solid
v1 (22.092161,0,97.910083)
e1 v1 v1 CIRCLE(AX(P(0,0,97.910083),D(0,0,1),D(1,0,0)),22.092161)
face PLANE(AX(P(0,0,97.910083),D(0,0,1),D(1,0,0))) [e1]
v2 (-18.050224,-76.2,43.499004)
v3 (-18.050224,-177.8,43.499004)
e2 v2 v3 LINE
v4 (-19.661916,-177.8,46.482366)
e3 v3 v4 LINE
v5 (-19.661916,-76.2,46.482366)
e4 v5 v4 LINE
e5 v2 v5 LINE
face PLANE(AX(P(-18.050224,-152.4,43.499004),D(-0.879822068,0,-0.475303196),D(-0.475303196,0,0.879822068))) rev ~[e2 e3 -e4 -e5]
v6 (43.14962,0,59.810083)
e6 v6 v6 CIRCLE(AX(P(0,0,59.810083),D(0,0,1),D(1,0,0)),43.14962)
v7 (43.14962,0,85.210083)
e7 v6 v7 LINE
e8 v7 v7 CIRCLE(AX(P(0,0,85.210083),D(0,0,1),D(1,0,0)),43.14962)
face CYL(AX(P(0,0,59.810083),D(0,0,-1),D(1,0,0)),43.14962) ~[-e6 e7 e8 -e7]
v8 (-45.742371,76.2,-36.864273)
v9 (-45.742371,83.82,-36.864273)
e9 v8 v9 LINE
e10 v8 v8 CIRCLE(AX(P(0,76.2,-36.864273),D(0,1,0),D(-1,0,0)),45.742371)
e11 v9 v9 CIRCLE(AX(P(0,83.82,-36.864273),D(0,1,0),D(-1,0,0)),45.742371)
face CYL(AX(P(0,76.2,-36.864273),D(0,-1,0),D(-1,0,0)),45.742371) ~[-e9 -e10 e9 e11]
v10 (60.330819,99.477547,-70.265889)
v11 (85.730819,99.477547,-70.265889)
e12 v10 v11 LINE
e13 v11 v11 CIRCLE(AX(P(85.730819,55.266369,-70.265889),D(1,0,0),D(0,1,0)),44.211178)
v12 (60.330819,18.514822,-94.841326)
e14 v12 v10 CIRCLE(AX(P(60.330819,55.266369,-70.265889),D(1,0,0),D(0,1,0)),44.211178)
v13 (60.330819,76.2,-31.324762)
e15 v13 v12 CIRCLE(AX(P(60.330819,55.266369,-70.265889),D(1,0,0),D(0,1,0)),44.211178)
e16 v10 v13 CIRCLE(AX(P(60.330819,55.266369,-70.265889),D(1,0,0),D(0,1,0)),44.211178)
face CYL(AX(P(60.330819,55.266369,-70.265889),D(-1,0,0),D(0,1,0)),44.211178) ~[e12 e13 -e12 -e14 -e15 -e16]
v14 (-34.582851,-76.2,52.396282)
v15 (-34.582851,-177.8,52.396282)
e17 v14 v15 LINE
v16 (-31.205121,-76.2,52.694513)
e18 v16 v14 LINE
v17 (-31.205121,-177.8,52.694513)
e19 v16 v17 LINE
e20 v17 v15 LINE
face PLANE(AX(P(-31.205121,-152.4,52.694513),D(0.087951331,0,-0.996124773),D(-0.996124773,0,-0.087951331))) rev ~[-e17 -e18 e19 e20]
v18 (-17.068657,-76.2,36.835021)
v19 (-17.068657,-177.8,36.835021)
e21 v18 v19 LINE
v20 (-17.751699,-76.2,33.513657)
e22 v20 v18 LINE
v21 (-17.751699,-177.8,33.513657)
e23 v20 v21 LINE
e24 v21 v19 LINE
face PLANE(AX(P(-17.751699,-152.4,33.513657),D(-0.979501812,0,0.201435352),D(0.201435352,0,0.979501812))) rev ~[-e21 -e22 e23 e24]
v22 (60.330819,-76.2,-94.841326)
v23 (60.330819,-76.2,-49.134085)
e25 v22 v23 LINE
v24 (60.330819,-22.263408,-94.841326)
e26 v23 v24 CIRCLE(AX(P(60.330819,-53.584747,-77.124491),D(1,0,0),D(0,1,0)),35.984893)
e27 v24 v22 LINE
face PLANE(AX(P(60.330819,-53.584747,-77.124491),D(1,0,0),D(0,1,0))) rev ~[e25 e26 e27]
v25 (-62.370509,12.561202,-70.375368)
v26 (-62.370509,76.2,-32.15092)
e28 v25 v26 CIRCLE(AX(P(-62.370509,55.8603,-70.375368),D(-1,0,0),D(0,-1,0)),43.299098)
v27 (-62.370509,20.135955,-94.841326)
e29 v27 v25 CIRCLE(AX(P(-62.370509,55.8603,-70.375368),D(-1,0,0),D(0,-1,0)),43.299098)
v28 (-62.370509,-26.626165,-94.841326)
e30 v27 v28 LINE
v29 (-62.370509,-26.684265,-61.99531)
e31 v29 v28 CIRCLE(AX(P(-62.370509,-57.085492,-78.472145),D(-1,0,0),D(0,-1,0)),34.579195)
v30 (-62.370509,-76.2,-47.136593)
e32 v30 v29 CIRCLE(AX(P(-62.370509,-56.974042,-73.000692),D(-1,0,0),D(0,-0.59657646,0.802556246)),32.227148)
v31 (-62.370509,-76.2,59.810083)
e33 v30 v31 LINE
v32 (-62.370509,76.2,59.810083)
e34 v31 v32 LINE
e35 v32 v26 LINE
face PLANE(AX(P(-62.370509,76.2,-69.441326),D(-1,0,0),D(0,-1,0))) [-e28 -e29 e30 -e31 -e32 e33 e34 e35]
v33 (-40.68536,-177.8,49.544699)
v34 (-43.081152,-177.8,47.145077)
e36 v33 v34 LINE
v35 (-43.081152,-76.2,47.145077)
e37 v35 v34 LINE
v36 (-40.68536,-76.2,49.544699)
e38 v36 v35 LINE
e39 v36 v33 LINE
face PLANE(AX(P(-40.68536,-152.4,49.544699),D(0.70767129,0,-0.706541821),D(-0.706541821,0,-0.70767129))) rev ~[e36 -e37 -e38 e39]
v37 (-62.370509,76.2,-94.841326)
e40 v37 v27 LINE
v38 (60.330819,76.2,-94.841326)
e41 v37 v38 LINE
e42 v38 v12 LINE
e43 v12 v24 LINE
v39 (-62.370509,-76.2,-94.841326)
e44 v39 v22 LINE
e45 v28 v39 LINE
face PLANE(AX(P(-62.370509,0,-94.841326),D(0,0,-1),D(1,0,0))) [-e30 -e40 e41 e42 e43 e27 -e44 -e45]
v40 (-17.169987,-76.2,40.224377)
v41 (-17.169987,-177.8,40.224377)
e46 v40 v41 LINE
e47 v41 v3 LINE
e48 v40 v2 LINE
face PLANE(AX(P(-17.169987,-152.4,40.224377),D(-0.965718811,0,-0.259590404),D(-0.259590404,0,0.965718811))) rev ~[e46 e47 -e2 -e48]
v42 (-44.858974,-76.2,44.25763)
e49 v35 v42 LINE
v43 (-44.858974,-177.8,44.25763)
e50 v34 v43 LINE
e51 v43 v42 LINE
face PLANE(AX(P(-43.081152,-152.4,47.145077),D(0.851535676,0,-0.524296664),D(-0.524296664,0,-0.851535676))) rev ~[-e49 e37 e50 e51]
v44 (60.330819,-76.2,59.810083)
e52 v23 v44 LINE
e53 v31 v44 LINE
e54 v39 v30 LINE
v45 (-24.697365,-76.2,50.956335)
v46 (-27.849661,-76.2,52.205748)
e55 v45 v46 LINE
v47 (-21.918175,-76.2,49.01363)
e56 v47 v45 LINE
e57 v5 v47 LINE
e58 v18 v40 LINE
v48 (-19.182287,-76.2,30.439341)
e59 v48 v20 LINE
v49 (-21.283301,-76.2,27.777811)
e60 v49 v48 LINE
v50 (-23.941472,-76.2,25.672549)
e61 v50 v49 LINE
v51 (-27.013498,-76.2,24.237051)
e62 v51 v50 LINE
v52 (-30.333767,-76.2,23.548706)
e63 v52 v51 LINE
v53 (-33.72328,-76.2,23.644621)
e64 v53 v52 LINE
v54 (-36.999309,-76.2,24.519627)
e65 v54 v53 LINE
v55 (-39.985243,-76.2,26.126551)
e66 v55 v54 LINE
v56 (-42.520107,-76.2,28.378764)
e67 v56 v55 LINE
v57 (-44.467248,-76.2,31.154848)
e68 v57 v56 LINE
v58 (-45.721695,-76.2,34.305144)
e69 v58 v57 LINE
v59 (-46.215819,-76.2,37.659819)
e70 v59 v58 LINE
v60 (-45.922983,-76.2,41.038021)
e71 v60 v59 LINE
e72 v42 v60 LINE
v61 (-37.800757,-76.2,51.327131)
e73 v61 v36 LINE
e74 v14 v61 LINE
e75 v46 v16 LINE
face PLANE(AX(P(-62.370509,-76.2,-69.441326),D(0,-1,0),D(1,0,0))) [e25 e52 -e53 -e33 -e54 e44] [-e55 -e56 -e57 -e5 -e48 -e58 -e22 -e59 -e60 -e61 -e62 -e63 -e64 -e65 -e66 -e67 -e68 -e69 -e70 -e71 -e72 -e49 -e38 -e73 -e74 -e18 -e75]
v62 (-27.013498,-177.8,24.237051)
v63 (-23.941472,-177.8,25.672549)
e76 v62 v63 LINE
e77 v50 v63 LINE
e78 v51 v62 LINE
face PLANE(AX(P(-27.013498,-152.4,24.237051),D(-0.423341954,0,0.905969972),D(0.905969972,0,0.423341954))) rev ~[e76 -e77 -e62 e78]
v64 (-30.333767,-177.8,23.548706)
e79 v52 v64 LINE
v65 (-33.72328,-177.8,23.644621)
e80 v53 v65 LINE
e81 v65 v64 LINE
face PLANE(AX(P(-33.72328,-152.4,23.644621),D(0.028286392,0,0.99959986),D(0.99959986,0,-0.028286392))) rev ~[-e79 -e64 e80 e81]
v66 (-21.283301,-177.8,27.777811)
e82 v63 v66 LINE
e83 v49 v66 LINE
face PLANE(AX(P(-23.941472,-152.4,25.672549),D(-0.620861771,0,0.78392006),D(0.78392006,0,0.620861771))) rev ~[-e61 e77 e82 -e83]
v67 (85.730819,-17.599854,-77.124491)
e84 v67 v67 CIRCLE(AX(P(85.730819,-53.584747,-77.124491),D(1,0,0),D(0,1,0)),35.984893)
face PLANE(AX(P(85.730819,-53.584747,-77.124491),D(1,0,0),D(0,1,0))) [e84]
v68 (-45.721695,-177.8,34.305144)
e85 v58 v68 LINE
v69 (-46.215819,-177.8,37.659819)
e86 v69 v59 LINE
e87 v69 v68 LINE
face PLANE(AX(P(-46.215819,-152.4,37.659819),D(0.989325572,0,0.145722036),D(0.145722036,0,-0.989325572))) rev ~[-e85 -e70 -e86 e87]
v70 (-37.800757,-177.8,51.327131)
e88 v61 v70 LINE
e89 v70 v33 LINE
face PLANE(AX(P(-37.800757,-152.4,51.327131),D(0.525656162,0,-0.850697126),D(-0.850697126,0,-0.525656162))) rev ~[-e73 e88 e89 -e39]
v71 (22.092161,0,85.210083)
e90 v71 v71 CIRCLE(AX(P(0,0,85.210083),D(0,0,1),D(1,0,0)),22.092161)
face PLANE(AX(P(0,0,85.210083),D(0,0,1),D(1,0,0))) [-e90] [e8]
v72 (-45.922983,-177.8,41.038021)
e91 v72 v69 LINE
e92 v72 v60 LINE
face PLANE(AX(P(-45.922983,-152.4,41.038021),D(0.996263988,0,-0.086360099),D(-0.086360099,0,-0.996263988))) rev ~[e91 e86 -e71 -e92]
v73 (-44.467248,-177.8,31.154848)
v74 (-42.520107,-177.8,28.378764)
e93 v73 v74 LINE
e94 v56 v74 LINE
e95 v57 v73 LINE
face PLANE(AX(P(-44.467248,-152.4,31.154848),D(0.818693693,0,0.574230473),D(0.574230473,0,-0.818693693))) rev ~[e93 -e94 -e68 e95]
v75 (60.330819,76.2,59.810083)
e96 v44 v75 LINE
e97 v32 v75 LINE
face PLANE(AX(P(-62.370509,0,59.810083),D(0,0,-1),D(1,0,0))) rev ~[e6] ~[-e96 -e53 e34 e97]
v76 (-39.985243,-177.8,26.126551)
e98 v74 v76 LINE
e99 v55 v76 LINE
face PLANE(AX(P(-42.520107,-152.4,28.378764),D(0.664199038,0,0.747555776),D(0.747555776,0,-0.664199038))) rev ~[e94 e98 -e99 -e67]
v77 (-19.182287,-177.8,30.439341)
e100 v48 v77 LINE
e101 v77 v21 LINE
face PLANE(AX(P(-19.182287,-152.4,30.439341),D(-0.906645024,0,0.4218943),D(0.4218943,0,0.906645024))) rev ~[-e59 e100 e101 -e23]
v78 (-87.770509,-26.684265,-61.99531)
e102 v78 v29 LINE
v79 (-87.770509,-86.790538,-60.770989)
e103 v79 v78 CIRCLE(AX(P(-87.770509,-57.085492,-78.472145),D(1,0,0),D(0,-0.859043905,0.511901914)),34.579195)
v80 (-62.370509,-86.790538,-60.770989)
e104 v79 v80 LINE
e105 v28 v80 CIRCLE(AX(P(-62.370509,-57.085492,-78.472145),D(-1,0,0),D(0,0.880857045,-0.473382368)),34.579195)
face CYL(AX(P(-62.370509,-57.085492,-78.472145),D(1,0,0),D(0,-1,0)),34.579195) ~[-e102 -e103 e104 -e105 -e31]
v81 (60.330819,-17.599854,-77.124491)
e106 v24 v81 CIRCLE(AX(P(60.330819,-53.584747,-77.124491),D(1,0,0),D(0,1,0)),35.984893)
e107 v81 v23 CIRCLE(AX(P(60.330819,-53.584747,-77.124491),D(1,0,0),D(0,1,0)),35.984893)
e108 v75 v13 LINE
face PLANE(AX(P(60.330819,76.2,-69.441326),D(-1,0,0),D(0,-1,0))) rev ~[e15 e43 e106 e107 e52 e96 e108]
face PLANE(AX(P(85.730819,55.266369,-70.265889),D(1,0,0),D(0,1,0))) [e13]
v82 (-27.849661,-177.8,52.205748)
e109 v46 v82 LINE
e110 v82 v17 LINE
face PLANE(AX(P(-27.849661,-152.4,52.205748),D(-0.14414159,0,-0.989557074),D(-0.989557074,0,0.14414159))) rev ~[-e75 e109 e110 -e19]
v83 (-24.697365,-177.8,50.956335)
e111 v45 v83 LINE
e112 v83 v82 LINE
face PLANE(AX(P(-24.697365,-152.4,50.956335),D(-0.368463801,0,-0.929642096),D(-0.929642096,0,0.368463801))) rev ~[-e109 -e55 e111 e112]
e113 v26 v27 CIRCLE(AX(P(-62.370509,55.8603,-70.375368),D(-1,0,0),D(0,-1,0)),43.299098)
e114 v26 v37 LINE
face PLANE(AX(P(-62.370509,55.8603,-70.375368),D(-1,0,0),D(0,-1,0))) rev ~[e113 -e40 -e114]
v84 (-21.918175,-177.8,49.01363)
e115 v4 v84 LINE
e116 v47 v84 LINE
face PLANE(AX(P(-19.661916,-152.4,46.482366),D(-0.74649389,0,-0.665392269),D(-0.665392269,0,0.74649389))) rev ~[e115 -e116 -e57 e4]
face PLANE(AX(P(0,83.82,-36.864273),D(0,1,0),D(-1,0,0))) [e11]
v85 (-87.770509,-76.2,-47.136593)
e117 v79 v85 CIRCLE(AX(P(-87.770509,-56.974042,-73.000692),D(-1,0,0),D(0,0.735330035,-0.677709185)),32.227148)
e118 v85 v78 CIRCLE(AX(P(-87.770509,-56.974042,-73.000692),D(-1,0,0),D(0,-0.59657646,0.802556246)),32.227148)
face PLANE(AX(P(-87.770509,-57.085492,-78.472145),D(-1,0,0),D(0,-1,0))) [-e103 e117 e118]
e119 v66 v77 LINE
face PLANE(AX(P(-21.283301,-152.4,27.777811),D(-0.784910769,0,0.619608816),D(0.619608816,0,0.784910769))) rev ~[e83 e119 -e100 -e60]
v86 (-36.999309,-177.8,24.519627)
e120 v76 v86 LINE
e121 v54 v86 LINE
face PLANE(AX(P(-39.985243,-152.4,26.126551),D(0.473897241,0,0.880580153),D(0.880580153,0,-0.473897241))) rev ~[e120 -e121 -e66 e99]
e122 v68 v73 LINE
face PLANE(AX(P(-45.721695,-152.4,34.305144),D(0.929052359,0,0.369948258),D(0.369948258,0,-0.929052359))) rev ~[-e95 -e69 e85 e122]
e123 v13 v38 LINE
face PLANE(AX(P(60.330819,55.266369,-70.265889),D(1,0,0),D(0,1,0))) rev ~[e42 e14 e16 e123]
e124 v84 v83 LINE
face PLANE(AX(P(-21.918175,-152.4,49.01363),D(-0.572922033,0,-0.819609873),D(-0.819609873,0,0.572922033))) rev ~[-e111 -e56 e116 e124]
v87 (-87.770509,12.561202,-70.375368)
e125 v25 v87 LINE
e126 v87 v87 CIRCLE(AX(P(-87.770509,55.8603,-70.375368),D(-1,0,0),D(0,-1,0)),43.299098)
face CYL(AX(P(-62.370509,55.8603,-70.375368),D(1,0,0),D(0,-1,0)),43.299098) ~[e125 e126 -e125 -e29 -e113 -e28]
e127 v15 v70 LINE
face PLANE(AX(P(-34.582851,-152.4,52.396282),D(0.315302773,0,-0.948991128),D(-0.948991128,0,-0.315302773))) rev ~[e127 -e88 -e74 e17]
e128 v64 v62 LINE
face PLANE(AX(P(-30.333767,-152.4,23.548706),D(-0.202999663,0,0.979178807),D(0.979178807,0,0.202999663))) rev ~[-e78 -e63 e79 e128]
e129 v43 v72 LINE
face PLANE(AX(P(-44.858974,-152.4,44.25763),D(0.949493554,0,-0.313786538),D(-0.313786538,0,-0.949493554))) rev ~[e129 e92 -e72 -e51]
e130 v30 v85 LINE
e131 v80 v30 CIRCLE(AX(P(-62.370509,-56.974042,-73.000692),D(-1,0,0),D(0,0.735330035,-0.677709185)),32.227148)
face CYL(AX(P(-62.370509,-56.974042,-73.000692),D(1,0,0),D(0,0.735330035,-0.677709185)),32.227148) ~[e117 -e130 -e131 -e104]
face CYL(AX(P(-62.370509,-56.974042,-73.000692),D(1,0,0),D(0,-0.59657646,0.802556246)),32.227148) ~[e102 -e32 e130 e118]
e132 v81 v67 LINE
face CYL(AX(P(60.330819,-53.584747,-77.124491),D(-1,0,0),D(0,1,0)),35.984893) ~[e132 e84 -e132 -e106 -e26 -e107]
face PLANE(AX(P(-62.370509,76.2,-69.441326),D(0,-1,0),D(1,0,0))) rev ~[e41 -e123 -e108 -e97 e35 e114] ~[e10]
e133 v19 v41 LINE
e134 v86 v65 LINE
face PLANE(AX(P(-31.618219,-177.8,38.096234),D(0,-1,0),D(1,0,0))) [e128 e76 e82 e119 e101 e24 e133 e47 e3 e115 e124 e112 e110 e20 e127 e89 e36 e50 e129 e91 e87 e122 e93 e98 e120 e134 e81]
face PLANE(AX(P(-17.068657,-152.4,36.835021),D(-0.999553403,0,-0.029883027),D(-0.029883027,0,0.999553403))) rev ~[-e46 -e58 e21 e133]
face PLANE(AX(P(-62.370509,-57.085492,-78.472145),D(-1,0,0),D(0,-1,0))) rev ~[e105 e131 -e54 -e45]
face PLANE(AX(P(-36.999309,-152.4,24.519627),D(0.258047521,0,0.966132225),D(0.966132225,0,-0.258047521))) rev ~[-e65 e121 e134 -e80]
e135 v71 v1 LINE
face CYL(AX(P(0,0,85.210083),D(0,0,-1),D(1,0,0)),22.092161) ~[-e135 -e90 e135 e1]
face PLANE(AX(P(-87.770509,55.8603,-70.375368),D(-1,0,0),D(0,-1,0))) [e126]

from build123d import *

# Parameters (mm, degrees)
F1_DEPTH  = 25.4
F2_DEPTH  = 127
F3_W      = 122.7013282478
F3_H      = 129.251409322
F4_DEPTH  = 76.2
F5_DEPTH  = 76.2
F6_DEPTH  = 25.4
F7_R      = 35.9848930873
F8_DEPTH  = 25.4
F9_R      = 44.2111783383
F10_DEPTH = 25.4
F13_R     = 34.5791946556
F12_R     = 32.2271478821
F14_DEPTH = 25.4
F15_R     = 43.299097817
F16_DEPTH = 25.4
F17_R     = 43.1496203252
F18_DEPTH = 25.4
F19_R     = 22.0921612012
F20_DEPTH = 12.7
F21_R     = 45.7423711287
F22_DEPTH = 7.62
F23_DEPTH = 25.4


# Not quite as in the source:
# - a feature names something its author has since deleted; it is built from what else it names


with BuildPart() as f1:
    # F0 (on Front) → F1 (new body)
    with BuildSketch(Plane.XZ):
        Polygon((-46.2158193521, 37.6598188143), (-45.7216948271, 34.3051441014), (-44.4672482626, 31.1548480371), (-42.5201071978, 28.3787638977), (-39.9852425112, 26.1265510978), (-36.9993094144, 24.5196270122), (-33.7232803334, 23.6446213344), (-30.333766844, 23.548705847), (-27.0134984958, 24.2370513787), (-23.9414718147, 25.6725490438), (-21.2833005544, 27.7778107915), (-19.1822874155, 30.4393414161), (-17.7516985602, 33.5136571128), (-17.068657404, 36.8350207265), (-17.1699868723, 40.2243766851), (-18.0502242674, 43.4990039316), (-19.6619157634, 46.4823664636), (-21.9181746546, 49.0136304347), (-24.6973654401, 50.9563347491), (-27.8496612254, 52.2057477143), (-31.2051209287, 52.6945131539), (-34.5828508489, 52.3962815967), (-37.8007566917, 51.3271307829), (-40.6853603202, 49.5446989099), (-43.0811520061, 47.1450773411), (-44.8589739995, 44.2576302965), (-45.9229834566, 41.0380207937), align=None)
    extrude(amount=F1_DEPTH)

    # F2 (add): a face of the model
    f2_faces = [f1.faces().sort_by_distance(p)[0] for p in [
        (-31.618218869, -25.4, 38.0962342024),
    ]]
    extrude(f2_faces, amount=F2_DEPTH)

    # F3 (on Front) → F4 (join)
    with BuildSketch(Plane.XZ):
        with Locations((-1.0198447853, -4.8156213015)):
            Rectangle(F3_W, F3_H)
    extrude(amount=F4_DEPTH)

    # F5 (add): a face of the model
    f5_faces = [f1.faces().sort_by_distance(p)[0] for p in [
        (-1.0198447853, 0, -4.8156213015),
    ]]
    extrude(f5_faces, amount=F5_DEPTH)

    # F6 (add): a face of the model
    f6_faces = [f1.faces().sort_by_distance(p)[0] for p in [
        (-1.0198447853, 0, -69.4413259625),
    ]]
    extrude(f6_faces, amount=F6_DEPTH)

    # F7 (on face) → F8 (join)
    with BuildSketch(Plane.YZ.offset(60.3308193386)):
        with Locations((-53.5847470164, -77.124491334)):
            Circle(F7_R)
    extrude(amount=F8_DEPTH)

    # F9 (on face) → F10 (join)
    with BuildSketch(Plane.YZ.offset(60.3308193386)):
        with Locations((55.2663691342, -70.2658891678)):
            Circle(F9_R)
    extrude(amount=F10_DEPTH)

    # F13 (on face) + F12 (on face) → F14 (join)
    with BuildSketch(Plane(origin=(-62.3705089092, 0, 0), x_dir=(0, -1, 0), z_dir=(-1, 0, 0))):
        with Locations((57.0854917169, -78.4721449018)):
            Circle(F13_R)
    with BuildSketch(Plane(origin=(-62.3705089092, 0, 0), x_dir=(0, -1, 0), z_dir=(-1, 0, 0))):
        with Locations((56.974042207, -73.0006918311)):
            Circle(F12_R)
        with BuildLine():
            Line((76.2, -94.8413259625), (76.2, -47.1365930153))
            ThreePointArc((76.2, -47.1365930153), (33.0171171216, -51.4448387729), (33.2764524277, -94.8413259625))
            Line((33.2764524277, -94.8413259625), (76.2, -94.8413259625))
        make_face()
    extrude(amount=F14_DEPTH)

    # F15 (on face) → F16 (join)
    with BuildSketch(Plane(origin=(-62.3705089092, 0, 0), x_dir=(0, -1, 0), z_dir=(-1, 0, 0))):
        with Locations((-55.8602996171, -70.3753679991)):
            Circle(F15_R)
    extrude(amount=F16_DEPTH)

    # F17 (on face) → F18 (join)
    with BuildSketch(Plane.XY.offset(59.8100833595)):
        Circle(F17_R)
    extrude(amount=F18_DEPTH)

    # F19 (on face) → F20 (join)
    with BuildSketch(Plane.XY.offset(85.2100833595)):
        Circle(F19_R)
    extrude(amount=F20_DEPTH)

    # F21 (on face) → F22 (join)
    with BuildSketch(Plane(origin=(0, 76.2, 0), x_dir=(-1, 0, 0), z_dir=(0, 1, 0))):
        with Locations((0, -36.8642732501)):
            Circle(F21_R)
    extrude(amount=F22_DEPTH)

    # F23 (add): a face of the model
    f23_faces = [f1.faces().sort_by_distance(p)[0] for p in [
        (-31.618218869, -152.4, 38.0962342024),
    ]]
    extrude(f23_faces, amount=F23_DEPTH)


solid = f1.part
